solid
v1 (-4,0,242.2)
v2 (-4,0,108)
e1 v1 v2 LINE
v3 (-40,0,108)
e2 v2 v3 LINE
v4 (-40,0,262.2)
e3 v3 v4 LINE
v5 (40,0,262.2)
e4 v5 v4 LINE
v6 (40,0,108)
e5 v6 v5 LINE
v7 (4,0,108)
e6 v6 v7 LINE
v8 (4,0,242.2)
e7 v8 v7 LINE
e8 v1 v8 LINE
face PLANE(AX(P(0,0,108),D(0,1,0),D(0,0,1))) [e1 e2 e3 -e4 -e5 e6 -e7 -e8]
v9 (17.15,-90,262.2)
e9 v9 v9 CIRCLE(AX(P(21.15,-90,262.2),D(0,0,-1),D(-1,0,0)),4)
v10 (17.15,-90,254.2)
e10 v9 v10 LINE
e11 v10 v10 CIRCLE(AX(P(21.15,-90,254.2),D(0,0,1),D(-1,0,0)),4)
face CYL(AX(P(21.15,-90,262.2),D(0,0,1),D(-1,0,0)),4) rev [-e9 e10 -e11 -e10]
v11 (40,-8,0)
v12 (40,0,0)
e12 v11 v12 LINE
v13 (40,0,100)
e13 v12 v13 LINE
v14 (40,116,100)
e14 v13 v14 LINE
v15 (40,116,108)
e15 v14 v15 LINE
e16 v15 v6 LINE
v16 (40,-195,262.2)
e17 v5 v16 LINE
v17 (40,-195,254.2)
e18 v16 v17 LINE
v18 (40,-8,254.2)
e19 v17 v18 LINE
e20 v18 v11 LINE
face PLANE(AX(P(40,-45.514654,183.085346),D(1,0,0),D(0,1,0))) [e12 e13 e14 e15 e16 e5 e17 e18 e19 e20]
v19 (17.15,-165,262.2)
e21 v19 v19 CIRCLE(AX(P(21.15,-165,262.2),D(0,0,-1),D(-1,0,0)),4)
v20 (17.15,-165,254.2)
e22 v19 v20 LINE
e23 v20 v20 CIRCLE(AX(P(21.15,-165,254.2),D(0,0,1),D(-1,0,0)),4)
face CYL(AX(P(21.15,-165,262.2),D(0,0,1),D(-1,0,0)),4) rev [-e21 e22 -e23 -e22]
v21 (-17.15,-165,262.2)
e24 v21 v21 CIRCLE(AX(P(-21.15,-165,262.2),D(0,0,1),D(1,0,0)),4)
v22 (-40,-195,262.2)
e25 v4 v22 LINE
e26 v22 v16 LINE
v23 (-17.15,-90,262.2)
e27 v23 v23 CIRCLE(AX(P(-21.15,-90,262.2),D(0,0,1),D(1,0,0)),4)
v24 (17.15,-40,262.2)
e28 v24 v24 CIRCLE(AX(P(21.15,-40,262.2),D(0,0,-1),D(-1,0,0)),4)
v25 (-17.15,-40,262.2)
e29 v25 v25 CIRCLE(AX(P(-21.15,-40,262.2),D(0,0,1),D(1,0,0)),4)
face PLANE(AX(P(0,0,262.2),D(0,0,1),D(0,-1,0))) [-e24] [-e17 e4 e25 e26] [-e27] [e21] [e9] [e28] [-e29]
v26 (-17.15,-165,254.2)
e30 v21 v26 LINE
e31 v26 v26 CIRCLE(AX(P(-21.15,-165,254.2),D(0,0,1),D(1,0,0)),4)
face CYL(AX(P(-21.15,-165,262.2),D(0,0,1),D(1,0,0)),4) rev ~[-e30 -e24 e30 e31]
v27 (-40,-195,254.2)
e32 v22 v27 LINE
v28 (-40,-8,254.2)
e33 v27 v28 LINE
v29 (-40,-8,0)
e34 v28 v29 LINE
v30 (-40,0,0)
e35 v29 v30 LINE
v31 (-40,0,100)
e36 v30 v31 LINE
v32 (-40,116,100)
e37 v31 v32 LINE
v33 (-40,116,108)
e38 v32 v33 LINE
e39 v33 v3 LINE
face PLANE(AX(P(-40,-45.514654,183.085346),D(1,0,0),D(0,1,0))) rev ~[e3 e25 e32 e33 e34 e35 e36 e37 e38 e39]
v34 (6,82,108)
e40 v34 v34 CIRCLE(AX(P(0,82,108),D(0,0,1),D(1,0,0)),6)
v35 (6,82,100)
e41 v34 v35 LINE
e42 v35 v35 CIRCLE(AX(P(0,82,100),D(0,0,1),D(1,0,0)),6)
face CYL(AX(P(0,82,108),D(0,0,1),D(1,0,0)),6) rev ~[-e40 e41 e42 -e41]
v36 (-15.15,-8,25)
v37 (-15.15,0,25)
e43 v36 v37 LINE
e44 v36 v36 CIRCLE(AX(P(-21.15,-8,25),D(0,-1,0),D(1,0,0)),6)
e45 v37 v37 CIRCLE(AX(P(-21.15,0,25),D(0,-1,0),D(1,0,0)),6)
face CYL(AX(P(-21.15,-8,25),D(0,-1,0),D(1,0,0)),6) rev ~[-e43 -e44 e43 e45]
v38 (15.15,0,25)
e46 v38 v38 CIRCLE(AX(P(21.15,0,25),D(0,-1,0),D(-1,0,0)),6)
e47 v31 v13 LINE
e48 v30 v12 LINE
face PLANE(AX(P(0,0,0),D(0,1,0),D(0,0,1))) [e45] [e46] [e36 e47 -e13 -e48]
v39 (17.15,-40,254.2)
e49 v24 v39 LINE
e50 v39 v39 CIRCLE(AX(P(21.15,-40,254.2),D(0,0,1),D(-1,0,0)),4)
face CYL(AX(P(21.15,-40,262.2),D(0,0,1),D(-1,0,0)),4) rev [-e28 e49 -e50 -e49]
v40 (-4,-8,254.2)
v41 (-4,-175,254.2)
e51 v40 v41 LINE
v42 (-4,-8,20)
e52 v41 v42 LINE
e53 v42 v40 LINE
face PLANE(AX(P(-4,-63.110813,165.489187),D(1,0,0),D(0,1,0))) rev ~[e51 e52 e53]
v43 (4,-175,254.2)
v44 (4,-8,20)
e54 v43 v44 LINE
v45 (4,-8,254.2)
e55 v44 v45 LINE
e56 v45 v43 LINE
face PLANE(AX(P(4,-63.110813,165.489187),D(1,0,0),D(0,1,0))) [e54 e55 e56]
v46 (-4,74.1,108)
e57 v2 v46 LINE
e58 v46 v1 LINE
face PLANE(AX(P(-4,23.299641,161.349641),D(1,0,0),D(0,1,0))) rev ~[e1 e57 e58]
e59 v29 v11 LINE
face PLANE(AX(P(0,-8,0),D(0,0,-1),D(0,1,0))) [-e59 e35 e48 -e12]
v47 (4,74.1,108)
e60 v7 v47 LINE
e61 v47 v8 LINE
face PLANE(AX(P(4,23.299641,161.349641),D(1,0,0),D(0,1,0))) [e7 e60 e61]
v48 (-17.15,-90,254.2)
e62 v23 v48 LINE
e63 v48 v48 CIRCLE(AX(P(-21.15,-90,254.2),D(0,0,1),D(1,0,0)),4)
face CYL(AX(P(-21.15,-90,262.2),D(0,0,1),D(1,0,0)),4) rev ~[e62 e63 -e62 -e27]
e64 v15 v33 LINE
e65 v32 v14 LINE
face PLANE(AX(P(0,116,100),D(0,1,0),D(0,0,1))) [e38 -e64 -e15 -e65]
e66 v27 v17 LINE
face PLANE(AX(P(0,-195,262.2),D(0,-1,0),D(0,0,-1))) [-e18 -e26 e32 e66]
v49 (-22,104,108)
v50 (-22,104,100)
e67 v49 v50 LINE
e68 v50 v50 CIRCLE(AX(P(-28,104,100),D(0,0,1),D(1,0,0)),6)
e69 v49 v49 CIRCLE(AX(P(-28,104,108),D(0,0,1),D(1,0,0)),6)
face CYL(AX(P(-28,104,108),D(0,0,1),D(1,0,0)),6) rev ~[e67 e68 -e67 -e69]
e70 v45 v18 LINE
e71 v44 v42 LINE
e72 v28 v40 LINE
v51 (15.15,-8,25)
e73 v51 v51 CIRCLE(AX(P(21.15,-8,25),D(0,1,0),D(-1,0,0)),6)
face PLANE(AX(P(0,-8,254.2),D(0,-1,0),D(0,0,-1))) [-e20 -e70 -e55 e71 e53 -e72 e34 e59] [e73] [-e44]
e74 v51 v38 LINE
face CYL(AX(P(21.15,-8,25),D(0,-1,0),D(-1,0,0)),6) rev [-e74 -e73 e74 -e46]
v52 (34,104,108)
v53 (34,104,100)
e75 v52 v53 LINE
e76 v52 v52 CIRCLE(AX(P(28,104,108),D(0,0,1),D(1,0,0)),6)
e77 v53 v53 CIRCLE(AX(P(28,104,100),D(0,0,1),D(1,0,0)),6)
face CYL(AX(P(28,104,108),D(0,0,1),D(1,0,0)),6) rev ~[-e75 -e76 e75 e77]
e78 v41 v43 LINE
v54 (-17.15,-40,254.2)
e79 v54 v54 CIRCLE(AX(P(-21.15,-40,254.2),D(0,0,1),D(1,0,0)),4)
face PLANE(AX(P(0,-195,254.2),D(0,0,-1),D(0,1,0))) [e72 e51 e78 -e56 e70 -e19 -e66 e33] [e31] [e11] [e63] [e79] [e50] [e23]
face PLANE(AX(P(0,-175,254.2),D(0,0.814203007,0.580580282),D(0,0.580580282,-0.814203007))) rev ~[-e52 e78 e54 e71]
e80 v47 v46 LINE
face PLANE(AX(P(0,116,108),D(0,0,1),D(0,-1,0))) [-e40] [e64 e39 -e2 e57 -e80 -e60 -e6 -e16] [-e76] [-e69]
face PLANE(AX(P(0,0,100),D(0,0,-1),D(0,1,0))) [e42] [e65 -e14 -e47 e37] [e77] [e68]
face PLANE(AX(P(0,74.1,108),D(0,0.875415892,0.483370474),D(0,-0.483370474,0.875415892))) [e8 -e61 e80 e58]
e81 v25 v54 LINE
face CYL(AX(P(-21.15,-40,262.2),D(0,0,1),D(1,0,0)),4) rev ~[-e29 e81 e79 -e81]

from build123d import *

# Parameters (mm, degrees)
F1_DEPTH = 40
F2_DEPTH = 4
F3_R     = 4
F4_DEPTH = 262.201
F5_R     = 6
F6_DEPTH = 124.001
F7_R     = 6
F8_DEPTH = 108.001


# Not quite as in the source:
# - a pattern or mirror of a feature is missing from the dataset's text; its kind, count and spacing are read off the source's solid


with BuildPart() as f1:
    # F0 (on Right) → F1 (new body, symmetric)
    with BuildSketch(Plane.YZ):
        Polygon((0, 262.2), (-195, 262.2), (-195, 254.2), (-175, 254.2), (-8, 254.2), (-8, 20), (-8, 0), (0, 0), (0, 100), (0, 108), (0, 242.2), align=None)
        Polygon((74.1, 108), (0, 108), (0, 100), (116, 100), (116, 108), align=None)
    extrude(amount=F1_DEPTH, both=True)

    # F0 (on Right) → F2 (join, symmetric)
    with BuildSketch(Plane.YZ):
        Polygon((-8, 254.2), (-175, 254.2), (-8, 20), align=None)
        Polygon((74.1, 108), (0, 242.2), (0, 108), align=None)
    extrude(amount=F2_DEPTH, both=True)

    # F3 (on face) → F4 (cut, through all)
    with BuildSketch(Plane.XY.offset(262.2)):
        with Locations((-21.15, -40)):
            Circle(F3_R)
        with Locations((-21.15, -90)):
            Circle(F3_R)
        with Locations((-21.15, -165)):
            Circle(F3_R)
    f4 = extrude(amount=-F4_DEPTH, mode=Mode.SUBTRACT)

    # F4_copies: F4 across plane
    add(f4.mirror(Plane(origin=(0, 0, 0), x_dir=(0, 0, 1), z_dir=(1, 0, 0))), mode=Mode.SUBTRACT)

    # F5 (on face) → F6 (cut, through all)
    with BuildSketch(Plane.XZ.offset(8)):
        with Locations((-21.15, 25)):
            Circle(F5_R)
    f6 = extrude(amount=-F6_DEPTH, mode=Mode.SUBTRACT)

    # F6_copies: F6 across plane
    add(f6.mirror(Plane(origin=(0, 0, 0), x_dir=(0, 0, 1), z_dir=(1, 0, 0))), mode=Mode.SUBTRACT)

    # F7 (on face) → F8 (cut, through all)
    with BuildSketch(Plane.XY.offset(108)):
        with Locations((-28, 104)):
            Circle(F7_R)
        with Locations((0, 82)):
            Circle(F7_R)
        with Locations((28, 104)):
            Circle(F7_R)
    extrude(amount=-F8_DEPTH, mode=Mode.SUBTRACT)


solid = f1.part
